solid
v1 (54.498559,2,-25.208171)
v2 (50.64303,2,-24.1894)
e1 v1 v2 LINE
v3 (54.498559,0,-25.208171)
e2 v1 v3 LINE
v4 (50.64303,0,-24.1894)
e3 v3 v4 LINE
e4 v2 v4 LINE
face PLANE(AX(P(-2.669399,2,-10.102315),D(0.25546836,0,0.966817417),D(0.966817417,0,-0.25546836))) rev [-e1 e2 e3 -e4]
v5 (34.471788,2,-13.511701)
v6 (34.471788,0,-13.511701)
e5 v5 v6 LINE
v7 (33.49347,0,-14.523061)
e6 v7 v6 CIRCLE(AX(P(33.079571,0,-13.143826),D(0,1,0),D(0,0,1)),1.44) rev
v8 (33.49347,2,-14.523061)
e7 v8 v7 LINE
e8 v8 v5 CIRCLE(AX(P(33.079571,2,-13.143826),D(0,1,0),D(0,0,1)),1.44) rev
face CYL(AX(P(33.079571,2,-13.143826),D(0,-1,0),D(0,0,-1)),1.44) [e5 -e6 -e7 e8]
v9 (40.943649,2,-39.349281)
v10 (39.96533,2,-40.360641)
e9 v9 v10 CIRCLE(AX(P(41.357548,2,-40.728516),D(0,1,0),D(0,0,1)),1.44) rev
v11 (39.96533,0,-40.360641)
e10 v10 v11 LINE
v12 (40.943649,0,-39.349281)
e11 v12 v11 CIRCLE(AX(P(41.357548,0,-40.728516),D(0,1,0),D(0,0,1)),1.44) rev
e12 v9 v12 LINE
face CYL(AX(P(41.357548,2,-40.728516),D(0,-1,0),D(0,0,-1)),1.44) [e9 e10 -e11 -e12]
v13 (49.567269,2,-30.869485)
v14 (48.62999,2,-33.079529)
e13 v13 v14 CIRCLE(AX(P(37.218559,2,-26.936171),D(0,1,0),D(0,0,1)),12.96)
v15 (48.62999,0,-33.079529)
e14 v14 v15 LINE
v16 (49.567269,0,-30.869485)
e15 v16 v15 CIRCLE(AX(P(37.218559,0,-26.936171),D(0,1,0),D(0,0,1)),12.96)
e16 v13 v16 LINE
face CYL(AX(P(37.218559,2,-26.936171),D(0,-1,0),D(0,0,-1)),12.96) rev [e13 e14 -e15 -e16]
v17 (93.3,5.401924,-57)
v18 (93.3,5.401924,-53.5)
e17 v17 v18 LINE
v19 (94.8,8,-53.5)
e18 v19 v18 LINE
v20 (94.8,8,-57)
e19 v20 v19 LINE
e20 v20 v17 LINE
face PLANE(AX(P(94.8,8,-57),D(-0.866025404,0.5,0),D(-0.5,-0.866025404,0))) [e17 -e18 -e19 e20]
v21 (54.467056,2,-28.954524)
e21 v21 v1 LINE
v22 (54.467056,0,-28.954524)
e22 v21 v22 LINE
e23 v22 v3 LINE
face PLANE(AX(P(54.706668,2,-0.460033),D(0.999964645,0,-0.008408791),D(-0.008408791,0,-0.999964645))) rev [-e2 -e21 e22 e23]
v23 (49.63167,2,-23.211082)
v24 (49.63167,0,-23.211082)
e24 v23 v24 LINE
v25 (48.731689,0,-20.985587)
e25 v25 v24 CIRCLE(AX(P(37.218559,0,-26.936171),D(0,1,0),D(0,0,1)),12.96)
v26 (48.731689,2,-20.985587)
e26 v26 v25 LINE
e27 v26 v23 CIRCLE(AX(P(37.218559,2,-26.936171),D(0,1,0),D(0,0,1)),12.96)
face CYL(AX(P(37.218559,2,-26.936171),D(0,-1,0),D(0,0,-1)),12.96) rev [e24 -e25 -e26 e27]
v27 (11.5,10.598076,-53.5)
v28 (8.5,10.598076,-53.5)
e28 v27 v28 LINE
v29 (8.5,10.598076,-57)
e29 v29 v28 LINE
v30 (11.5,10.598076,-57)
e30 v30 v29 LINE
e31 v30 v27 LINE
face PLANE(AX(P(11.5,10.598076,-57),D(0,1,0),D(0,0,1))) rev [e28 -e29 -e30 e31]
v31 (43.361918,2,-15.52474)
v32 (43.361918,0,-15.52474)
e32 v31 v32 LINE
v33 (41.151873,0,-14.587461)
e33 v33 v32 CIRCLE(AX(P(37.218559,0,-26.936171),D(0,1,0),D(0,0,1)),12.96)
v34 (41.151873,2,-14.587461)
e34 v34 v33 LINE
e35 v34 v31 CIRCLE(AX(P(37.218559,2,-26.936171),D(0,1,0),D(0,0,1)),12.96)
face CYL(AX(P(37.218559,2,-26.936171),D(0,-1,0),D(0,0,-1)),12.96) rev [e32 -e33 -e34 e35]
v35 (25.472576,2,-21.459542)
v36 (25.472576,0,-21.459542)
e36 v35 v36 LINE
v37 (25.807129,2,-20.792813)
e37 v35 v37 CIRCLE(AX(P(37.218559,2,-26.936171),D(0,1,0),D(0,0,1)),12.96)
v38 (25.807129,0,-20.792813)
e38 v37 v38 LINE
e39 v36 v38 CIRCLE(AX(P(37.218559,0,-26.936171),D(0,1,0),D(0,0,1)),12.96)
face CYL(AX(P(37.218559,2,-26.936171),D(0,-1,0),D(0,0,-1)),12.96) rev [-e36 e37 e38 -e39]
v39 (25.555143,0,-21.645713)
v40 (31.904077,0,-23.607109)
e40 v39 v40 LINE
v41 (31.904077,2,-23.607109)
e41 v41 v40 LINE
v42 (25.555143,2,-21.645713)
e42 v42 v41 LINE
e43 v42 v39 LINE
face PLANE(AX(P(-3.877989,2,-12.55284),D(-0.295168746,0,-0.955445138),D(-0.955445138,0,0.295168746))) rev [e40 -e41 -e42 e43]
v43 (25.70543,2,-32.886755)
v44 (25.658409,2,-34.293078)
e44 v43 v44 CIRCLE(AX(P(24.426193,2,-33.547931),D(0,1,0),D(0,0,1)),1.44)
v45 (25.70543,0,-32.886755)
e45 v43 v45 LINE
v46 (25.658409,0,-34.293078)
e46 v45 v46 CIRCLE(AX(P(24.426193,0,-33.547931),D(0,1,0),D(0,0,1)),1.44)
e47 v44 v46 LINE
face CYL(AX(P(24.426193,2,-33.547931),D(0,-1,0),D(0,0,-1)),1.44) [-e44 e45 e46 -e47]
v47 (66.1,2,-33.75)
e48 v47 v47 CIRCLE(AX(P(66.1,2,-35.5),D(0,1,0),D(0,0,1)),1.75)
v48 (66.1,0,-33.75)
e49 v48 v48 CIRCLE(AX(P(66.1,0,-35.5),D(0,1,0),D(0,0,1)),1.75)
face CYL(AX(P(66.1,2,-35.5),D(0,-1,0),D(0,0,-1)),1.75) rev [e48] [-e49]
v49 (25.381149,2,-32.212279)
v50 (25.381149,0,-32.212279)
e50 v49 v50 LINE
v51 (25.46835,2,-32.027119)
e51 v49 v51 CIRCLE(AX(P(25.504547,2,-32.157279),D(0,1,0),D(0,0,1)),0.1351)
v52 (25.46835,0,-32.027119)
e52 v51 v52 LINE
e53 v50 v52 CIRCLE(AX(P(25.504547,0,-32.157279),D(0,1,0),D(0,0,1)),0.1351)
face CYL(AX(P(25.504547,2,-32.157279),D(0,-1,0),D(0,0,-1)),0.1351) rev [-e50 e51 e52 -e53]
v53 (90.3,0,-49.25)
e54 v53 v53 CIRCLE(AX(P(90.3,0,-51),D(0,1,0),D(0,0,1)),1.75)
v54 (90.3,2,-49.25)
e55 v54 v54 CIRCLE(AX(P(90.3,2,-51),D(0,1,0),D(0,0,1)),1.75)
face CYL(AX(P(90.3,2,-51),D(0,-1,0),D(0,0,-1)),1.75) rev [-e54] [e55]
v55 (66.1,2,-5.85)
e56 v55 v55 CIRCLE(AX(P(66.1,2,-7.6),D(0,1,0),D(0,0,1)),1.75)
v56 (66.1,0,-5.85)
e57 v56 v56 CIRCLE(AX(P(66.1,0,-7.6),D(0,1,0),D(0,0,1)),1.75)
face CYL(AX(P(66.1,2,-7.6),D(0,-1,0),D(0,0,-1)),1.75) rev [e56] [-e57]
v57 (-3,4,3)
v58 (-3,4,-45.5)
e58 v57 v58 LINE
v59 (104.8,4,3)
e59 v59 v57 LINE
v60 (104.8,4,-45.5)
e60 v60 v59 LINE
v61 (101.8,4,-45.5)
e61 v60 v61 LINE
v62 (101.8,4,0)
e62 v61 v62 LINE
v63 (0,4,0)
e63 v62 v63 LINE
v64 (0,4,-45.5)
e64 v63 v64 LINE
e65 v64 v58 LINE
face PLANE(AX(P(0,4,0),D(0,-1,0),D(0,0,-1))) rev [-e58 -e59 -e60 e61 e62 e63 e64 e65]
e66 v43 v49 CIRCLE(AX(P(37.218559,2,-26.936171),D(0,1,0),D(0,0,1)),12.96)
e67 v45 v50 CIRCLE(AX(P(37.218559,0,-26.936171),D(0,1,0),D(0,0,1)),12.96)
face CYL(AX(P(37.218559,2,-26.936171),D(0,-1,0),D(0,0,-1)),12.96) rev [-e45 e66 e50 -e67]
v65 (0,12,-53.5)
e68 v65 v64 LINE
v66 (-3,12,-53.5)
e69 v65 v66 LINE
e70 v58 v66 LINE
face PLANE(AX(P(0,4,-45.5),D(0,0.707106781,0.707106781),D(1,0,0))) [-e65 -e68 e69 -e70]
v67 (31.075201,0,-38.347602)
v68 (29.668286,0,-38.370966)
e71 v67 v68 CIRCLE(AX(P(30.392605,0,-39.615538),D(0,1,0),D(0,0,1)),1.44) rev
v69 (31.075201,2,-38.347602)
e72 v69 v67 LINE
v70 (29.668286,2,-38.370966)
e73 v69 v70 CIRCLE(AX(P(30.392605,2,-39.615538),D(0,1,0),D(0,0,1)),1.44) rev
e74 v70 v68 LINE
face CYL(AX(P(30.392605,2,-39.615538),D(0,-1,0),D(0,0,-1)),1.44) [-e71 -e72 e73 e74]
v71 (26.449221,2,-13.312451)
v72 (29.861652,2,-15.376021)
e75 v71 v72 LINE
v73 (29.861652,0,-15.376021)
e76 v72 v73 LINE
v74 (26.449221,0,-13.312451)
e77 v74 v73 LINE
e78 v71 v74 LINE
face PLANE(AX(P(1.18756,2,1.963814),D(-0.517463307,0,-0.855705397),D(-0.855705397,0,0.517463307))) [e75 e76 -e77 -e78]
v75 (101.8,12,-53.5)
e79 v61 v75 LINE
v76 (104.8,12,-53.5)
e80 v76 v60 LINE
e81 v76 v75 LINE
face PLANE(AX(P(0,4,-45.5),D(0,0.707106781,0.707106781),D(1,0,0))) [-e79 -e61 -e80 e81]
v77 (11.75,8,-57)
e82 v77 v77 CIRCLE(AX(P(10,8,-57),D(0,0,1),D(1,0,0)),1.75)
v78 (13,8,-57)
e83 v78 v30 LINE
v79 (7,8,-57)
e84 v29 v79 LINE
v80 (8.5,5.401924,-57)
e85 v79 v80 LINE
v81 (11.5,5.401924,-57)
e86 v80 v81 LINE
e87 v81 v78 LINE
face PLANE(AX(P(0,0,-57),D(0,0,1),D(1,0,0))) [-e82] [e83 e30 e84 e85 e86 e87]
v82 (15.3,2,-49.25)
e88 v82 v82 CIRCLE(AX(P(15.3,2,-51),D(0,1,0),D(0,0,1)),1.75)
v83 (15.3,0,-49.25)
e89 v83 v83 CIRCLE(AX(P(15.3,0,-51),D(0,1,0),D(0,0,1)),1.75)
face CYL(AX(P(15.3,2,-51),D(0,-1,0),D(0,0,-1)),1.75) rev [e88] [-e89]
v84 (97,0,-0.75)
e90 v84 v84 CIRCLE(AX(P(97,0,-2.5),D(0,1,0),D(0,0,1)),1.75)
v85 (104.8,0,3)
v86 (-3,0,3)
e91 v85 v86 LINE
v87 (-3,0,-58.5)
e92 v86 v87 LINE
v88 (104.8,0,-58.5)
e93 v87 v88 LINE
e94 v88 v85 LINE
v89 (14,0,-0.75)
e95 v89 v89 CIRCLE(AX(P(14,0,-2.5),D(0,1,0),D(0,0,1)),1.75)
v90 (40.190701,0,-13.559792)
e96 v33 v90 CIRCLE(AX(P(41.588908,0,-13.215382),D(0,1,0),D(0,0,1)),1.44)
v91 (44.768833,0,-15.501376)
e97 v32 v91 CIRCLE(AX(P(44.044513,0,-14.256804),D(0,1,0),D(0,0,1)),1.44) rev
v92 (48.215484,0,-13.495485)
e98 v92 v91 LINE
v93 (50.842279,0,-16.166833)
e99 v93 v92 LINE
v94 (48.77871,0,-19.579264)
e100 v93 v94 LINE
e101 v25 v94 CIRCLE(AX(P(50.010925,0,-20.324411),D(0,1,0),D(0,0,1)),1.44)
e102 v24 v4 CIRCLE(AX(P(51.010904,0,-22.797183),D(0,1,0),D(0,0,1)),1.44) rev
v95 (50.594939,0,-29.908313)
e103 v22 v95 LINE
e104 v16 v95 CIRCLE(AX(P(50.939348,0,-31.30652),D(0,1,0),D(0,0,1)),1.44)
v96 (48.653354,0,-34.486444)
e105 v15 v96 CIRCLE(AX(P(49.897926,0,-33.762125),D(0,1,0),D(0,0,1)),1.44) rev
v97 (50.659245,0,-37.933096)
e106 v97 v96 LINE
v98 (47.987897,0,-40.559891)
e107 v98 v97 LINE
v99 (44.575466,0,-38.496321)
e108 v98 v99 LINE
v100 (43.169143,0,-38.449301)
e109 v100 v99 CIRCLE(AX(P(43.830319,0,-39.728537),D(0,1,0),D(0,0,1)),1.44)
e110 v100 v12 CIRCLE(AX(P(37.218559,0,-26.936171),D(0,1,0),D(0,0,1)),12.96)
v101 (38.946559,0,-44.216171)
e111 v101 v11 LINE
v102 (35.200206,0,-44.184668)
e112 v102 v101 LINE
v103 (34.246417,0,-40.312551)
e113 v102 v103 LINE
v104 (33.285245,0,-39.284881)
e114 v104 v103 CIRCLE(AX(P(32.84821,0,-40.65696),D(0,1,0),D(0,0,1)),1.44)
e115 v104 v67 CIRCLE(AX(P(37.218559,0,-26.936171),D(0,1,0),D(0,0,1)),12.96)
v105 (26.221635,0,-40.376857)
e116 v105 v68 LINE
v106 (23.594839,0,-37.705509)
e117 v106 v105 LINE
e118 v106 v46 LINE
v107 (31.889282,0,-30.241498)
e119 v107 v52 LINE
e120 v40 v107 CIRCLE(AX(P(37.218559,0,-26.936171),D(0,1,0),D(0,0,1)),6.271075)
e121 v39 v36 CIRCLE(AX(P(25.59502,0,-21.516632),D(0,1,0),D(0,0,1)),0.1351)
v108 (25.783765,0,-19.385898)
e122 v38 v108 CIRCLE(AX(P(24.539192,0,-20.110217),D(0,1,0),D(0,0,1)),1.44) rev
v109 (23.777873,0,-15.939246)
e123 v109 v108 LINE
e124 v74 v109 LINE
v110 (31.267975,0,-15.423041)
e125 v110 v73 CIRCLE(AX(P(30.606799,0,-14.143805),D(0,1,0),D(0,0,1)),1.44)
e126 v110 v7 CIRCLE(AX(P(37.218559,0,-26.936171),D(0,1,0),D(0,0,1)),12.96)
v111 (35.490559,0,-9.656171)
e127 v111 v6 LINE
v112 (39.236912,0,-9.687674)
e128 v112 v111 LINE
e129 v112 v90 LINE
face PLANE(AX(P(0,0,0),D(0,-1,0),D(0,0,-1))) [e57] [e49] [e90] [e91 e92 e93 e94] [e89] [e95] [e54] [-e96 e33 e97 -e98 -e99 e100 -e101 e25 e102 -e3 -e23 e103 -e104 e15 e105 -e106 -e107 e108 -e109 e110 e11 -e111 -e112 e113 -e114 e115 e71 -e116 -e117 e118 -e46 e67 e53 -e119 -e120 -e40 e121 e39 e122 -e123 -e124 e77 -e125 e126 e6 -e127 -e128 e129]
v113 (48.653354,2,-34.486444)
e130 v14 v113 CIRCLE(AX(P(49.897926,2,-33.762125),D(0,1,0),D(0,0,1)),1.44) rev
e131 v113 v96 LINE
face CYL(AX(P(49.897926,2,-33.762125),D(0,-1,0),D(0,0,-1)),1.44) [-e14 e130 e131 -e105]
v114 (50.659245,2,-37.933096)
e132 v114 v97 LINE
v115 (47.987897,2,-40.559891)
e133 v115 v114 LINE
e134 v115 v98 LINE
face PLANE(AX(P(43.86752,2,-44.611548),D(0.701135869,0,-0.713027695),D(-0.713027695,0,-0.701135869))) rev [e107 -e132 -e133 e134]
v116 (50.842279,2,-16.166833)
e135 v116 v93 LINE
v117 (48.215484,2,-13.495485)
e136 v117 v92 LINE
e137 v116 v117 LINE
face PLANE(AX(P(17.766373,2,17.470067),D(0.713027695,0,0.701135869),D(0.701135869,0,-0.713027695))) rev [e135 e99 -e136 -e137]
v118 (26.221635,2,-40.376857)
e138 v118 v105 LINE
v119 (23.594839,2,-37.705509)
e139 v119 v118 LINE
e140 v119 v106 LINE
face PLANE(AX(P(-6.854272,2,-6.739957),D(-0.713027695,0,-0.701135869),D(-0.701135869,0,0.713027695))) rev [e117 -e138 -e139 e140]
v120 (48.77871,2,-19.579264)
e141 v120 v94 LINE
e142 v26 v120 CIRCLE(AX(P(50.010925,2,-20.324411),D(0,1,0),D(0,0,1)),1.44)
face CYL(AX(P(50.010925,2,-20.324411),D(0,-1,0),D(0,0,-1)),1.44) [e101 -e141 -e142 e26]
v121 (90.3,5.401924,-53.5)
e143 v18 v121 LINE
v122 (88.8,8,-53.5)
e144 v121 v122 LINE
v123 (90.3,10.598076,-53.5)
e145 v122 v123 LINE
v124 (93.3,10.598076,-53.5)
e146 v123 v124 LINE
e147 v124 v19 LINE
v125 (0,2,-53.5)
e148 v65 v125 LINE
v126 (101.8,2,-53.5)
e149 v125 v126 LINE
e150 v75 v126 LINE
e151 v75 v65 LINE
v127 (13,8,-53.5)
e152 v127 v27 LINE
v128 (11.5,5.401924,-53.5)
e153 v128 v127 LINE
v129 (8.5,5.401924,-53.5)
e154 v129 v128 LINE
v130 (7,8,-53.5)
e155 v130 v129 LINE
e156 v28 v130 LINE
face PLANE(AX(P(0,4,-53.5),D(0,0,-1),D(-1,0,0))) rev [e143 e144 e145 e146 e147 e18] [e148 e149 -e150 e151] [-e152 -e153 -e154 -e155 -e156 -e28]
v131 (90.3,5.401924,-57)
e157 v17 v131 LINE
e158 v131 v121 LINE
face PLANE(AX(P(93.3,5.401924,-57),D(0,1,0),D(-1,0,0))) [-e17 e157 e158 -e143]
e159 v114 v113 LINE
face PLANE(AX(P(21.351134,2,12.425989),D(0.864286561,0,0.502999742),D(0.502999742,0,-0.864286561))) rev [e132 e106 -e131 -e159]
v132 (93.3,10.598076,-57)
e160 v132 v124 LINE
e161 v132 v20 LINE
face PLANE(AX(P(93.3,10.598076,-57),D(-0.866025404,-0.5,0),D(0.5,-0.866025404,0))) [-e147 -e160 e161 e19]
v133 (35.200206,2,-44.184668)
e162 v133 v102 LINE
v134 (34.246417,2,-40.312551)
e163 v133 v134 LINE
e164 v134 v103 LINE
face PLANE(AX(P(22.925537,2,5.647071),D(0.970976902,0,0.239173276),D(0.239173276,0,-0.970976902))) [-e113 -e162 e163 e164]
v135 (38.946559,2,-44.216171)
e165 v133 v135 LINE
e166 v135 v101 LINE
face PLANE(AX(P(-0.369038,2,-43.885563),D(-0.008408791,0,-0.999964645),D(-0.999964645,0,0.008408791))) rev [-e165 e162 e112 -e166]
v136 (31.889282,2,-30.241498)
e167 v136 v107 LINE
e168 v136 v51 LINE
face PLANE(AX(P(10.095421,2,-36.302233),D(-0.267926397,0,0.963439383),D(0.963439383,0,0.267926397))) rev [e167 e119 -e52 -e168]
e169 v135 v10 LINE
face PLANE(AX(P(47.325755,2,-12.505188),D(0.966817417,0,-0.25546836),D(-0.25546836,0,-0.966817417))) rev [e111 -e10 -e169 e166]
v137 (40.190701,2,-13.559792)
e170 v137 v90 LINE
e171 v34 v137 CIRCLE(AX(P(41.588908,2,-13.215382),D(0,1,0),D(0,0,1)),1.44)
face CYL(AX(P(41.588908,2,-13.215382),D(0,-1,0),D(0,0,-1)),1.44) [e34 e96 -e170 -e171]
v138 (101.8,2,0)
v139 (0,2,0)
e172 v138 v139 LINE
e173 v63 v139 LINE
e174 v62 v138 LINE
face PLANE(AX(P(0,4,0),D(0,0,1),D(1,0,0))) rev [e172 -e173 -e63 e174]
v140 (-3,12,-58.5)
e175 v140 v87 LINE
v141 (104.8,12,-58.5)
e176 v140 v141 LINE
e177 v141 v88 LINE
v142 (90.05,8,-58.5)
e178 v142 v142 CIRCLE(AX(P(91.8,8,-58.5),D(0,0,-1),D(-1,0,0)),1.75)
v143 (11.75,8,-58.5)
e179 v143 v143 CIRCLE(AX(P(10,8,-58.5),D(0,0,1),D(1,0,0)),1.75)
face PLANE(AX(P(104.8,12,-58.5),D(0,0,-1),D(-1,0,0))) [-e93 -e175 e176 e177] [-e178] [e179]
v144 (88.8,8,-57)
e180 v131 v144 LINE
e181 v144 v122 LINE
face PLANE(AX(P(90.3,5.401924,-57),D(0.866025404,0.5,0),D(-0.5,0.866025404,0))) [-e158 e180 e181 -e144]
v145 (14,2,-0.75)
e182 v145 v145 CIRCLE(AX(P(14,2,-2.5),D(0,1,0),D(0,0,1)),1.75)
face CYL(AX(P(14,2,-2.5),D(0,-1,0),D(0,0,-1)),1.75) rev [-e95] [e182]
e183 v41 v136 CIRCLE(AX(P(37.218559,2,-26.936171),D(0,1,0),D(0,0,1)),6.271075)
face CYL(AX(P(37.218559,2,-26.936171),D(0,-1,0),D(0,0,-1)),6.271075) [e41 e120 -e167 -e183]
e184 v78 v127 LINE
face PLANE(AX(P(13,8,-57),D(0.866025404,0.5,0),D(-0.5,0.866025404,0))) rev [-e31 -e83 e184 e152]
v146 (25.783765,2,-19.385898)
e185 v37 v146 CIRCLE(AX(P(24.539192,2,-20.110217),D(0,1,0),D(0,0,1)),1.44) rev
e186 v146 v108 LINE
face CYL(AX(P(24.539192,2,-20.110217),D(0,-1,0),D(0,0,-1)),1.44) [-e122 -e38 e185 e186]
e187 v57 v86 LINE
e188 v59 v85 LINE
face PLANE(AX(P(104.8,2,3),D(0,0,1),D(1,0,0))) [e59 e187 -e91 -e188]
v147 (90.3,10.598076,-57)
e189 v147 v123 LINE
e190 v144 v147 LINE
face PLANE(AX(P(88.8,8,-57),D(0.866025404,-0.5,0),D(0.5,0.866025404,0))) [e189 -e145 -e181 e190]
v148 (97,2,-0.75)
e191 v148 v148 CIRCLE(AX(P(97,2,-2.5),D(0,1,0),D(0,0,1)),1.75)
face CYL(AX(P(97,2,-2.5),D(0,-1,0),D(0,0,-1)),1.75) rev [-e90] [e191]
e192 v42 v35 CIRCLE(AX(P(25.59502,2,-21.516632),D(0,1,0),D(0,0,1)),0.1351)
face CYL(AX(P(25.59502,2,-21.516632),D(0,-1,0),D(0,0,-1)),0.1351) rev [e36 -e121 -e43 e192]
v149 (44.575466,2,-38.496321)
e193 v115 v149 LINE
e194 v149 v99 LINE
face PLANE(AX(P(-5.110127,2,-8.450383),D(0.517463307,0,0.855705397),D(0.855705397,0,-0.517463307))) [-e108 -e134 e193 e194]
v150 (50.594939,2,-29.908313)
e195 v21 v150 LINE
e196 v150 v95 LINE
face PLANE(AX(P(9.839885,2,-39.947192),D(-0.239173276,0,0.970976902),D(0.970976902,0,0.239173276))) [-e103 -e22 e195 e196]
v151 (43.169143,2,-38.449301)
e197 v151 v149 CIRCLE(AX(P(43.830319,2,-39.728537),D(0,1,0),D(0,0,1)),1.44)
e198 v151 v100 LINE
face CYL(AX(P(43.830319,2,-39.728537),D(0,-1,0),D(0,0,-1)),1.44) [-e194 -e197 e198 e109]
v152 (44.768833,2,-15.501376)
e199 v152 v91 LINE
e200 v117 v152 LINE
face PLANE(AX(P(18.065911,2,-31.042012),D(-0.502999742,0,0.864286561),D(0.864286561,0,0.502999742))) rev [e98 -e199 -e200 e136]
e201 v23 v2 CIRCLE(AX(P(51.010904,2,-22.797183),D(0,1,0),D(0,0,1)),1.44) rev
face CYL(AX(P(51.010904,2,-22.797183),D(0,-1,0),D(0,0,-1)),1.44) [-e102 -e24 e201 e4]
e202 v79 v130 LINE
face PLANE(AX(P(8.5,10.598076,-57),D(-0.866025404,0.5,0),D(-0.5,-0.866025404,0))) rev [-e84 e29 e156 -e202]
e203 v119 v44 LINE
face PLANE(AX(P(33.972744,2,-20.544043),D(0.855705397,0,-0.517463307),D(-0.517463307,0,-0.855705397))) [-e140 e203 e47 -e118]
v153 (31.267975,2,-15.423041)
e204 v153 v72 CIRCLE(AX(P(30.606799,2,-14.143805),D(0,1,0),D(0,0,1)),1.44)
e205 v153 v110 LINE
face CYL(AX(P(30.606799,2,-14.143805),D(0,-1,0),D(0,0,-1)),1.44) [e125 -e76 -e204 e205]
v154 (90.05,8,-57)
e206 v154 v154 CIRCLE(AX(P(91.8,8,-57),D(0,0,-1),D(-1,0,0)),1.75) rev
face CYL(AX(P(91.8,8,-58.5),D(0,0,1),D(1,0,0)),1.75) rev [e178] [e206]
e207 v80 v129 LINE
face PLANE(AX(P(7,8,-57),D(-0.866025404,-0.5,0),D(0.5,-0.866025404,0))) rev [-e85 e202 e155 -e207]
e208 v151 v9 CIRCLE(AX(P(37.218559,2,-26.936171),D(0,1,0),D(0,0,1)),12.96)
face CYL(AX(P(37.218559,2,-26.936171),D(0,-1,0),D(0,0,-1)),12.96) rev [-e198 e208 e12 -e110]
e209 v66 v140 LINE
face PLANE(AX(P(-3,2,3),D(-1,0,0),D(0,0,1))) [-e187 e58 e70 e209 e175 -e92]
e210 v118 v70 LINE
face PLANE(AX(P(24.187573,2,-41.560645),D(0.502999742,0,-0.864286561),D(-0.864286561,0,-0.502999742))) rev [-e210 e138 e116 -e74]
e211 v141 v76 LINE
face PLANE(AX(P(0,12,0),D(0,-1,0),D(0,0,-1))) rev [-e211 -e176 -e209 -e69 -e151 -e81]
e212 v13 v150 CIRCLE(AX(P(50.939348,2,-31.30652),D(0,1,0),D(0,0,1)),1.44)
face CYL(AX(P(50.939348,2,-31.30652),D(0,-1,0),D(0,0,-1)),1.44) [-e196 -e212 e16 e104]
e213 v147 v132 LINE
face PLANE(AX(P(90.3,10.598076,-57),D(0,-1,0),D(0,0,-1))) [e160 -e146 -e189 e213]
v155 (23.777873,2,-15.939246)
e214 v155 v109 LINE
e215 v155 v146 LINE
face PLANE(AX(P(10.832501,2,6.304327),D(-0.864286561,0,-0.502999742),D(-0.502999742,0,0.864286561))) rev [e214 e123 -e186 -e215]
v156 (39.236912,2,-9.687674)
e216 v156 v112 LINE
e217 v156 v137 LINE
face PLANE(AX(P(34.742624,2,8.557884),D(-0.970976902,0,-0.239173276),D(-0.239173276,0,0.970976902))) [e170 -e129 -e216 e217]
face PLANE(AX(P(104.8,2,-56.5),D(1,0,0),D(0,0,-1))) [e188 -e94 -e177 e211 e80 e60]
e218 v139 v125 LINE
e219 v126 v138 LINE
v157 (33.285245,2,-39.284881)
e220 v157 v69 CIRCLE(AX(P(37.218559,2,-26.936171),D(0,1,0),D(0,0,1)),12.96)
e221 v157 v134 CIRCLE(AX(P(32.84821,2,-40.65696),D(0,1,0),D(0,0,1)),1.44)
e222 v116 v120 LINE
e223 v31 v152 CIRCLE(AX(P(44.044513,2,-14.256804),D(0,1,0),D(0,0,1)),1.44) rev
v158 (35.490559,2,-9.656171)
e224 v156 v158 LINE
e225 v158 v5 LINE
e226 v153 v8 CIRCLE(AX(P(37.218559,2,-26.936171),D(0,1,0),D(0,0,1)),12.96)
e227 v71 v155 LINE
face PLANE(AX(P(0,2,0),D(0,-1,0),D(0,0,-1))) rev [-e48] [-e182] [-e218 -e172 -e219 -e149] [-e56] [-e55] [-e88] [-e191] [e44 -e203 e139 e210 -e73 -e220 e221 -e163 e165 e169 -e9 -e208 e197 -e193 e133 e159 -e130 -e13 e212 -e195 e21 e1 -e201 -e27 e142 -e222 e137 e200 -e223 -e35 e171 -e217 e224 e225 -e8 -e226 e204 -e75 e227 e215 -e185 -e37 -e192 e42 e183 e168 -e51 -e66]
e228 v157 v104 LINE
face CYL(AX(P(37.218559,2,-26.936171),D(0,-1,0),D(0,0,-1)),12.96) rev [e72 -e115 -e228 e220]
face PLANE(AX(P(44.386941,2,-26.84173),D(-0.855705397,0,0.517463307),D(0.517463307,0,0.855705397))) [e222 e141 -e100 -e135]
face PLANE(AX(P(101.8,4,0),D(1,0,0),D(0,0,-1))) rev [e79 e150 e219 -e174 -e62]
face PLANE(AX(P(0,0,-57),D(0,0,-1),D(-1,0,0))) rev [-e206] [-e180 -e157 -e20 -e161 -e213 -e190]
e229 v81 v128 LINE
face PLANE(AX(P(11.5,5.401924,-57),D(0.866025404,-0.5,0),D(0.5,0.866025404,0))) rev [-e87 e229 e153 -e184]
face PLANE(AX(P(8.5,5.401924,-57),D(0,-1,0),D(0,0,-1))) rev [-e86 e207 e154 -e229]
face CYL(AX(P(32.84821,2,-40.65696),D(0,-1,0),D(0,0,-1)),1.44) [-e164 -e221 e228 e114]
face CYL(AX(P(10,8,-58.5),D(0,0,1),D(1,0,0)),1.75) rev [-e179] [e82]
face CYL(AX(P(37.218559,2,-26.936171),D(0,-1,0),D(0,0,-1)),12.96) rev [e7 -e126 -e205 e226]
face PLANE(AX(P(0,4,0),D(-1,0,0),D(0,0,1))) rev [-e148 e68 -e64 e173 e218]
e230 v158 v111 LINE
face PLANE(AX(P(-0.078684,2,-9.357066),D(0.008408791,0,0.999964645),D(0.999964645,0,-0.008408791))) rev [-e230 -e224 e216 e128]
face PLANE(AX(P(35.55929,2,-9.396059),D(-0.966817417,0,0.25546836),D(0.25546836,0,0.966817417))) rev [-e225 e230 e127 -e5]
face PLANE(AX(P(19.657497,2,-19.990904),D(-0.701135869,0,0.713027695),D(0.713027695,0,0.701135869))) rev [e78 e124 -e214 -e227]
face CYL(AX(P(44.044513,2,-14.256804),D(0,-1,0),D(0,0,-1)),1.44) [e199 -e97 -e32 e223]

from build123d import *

# Parameters (mm, degrees)
SKETCH1_W           = 107.8
SKETCH1_H           = 59.5
SKETCH1_R           = 1.75
BOSS_EXTRUDE1_DEPTH = 2
BOSS_EXTRUDE2_START = 2
SKETCH1_3_W         = 107.8
SKETCH1_3_H         = 59.5
SKETCH1_3_W_2       = 101.8
SKETCH1_3_H_2       = 53.5
SKETCH1_3_R         = 1.75
BOSS_EXTRUDE2_DEPTH = 2
SKETCH3_W           = 107.8
SKETCH3_H           = 5
BOSS_EXTRUDE3_DEPTH = 12
CHAMFER1_SIZE       = 8
CUT_EXTRUDE1_DEPTH  = 3.5
SKETCH4_4_R         = 1.75
CUT_EXTRUDE3_DEPTH  = 120.663235791


with BuildPart() as part:
    # Sketch1 → Boss-Extrude1 (new body)
    with BuildSketch(Plane(origin=(0, 0, 0), x_dir=(1, 0, 0), z_dir=(0, 1, 0))):
        with Locations((50.9, 26.75)):
            Rectangle(SKETCH1_W, SKETCH1_H)
        with Locations(Location((15.3, 51, 0), (0, 0, 270))):
            Circle(SKETCH1_R, mode=Mode.SUBTRACT)
        with Locations(Location((14, 2.5, 0), (0, 0, 270))):
            Circle(SKETCH1_R, mode=Mode.SUBTRACT)
        with Locations(Location((90.3, 51, 0), (0, 0, 270))):
            Circle(SKETCH1_R, mode=Mode.SUBTRACT)
        with Locations(Location((97, 2.5, 0), (0, 0, 270))):
            Circle(SKETCH1_R, mode=Mode.SUBTRACT)
        with Locations(Location((66.1, 35.5, 0), (0, 0, 270))):
            Circle(SKETCH1_R, mode=Mode.SUBTRACT)
        with Locations(Location((66.1, 7.6, 0), (0, 0, 270))):
            Circle(SKETCH1_R, mode=Mode.SUBTRACT)
        with BuildLine():
            Line((23.594839055, 37.705508722), (26.221634516, 40.37685674))
            Line((26.221634516, 40.37685674), (29.668285754, 38.370965683))
            ThreePointArc((29.668285754, 38.370965683), (30.368695169, 38.175736851), (31.075200762, 38.347601602))
            ThreePointArc((31.075200762, 38.347601602), (32.158474755, 38.867522419), (33.285245302, 39.284881177))
            ThreePointArc((33.285245302, 39.284881177), (33.899901464, 39.673320939), (34.246417166, 40.312550564))
            Line((34.246417166, 40.312550564), (35.200205995, 44.184667628))
            Line((35.200205995, 44.184667628), (38.946559177, 44.216171044))
            Line((38.946559177, 44.216171044), (39.96533047, 40.360641412))
            ThreePointArc((39.96533047, 40.360641412), (40.322547086, 39.727329534), (40.943648713, 39.349281369))
            ThreePointArc((40.943648713, 39.349281369), (42.077278635, 38.950930518), (43.169142938, 38.449300631))
            ThreePointArc((43.169142938, 38.449300631), (43.878438868, 38.28934148), (44.575466073, 38.49632148))
            Line((44.575466073, 38.49632148), (47.987896856, 40.559891165))
            Line((47.987896856, 40.559891165), (50.659244873, 37.933095705))
            Line((50.659244873, 37.933095705), (48.653353816, 34.486444467))
            ThreePointArc((48.653353816, 34.486444467), (48.458124984, 33.786035052), (48.629989735, 33.079529459))
            ThreePointArc((48.629989735, 33.079529459), (49.149910552, 31.996255466), (49.56726931, 30.869484918))
            ThreePointArc((49.56726931, 30.869484918), (49.955709072, 30.254828756), (50.594938697, 29.908313054))
            Line((50.594938697, 29.908313054), (54.467055761, 28.954524225))
            Line((54.467055761, 28.954524225), (54.498559177, 25.208171044))
            Line((54.498559177, 25.208171044), (50.643029545, 24.18939975))
            ThreePointArc((50.643029545, 24.18939975), (50.009717667, 23.832183134), (49.631669502, 23.211081507))
            ThreePointArc((49.631669502, 23.211081507), (49.233318651, 22.077451586), (48.731688764, 20.985587282))
            ThreePointArc((48.731688764, 20.985587282), (48.571729613, 20.276291353), (48.778709614, 19.579264147))
            Line((48.778709614, 19.579264147), (50.842279299, 16.166833365))
            Line((50.842279299, 16.166833365), (48.215483838, 13.495485347))
            Line((48.215483838, 13.495485347), (44.7688326, 15.501376404))
            ThreePointArc((44.7688326, 15.501376404), (44.068423185, 15.696605237), (43.361917592, 15.524740485))
            ThreePointArc((43.361917592, 15.524740485), (42.278643599, 15.004819668), (41.151873051, 14.58746091))
            ThreePointArc((41.151873051, 14.58746091), (40.537216889, 14.199021149), (40.190701187, 13.559791523))
            Line((40.190701187, 13.559791523), (39.236912358, 9.687674459))
            Line((39.236912358, 9.687674459), (35.490559177, 9.656171044))
            Line((35.490559177, 9.656171044), (34.471787883, 13.511700675))
            ThreePointArc((34.471787883, 13.511700675), (34.114571267, 14.145012554), (33.49346964, 14.523060718))
            ThreePointArc((33.49346964, 14.523060718), (32.359839719, 14.921411569), (31.267975415, 15.423041456))
            ThreePointArc((31.267975415, 15.423041456), (30.558679486, 15.583000607), (29.86165228, 15.376020607))
            Line((29.86165228, 15.376020607), (26.449221498, 13.312450922))
            Line((26.449221498, 13.312450922), (23.77787348, 15.939246383))
            Line((23.77787348, 15.939246383), (25.783764538, 19.38589762))
            ThreePointArc((25.783764538, 19.38589762), (25.97899337, 20.086307036), (25.807128618, 20.792812629))
            ThreePointArc((25.807128618, 20.792812629), (25.63505412, 21.123769595), (25.472575587, 21.45954165))
            ThreePointArc((25.472575587, 21.45954165), (25.471521134, 21.57140422), (25.555142885, 21.645712693))
            Line((25.555142885, 21.645712693), (31.904076526, 23.60710923))
            ThreePointArc((31.904076526, 23.60710923), (43.489618325, 26.950155118), (31.889282249, 30.24149793))
            Line((31.889282249, 30.24149793), (25.46834976, 32.027118633))
            ThreePointArc((25.46834976, 32.027118633), (25.382322518, 32.099718242), (25.381148957, 32.212279391))
            ThreePointArc((25.381148957, 32.212279391), (25.538419769, 32.551858304), (25.705429589, 32.886754805))
            ThreePointArc((25.705429589, 32.886754805), (25.86538874, 33.596050734), (25.65840874, 34.29307794))
            Line((25.65840874, 34.29307794), (23.594839055, 37.705508722))
        make_face(mode=Mode.SUBTRACT)
    extrude(amount=BOSS_EXTRUDE1_DEPTH)

    # Sketch1<3> → Boss-Extrude2 (add)
    # profile 1 of 8: a face of its own
    with BuildSketch(Plane(origin=(0, 0, 0), x_dir=(1, 0, 0), z_dir=(0, 1, 0)).offset(BOSS_EXTRUDE2_START)):
        with Locations((50.9, 26.75)):
            Rectangle(SKETCH1_3_W, SKETCH1_3_H)
        with Locations((50.9, 26.75)):
            Rectangle(SKETCH1_3_W_2, SKETCH1_3_H_2, mode=Mode.SUBTRACT)
    # profile 2 of 8: a face of its own
    with BuildSketch(Plane(origin=(0, 0, 0), x_dir=(1, 0, 0), z_dir=(0, 1, 0)).offset(BOSS_EXTRUDE2_START)):
        with Locations(Location((66.1, 7.6, 0), (0, 0, 270))):
            Circle(SKETCH1_3_R)
    # profile 3 of 8: a face of its own
    with BuildSketch(Plane(origin=(0, 0, 0), x_dir=(1, 0, 0), z_dir=(0, 1, 0)).offset(BOSS_EXTRUDE2_START)):
        with Locations(Location((66.1, 35.5, 0), (0, 0, 270))):
            Circle(SKETCH1_3_R)
    # profile 4 of 8: a face of its own
    with BuildSketch(Plane(origin=(0, 0, 0), x_dir=(1, 0, 0), z_dir=(0, 1, 0)).offset(BOSS_EXTRUDE2_START)):
        with Locations(Location((97, 2.5, 0), (0, 0, 270))):
            Circle(SKETCH1_3_R)
    # profile 5 of 8: a face of its own
    with BuildSketch(Plane(origin=(0, 0, 0), x_dir=(1, 0, 0), z_dir=(0, 1, 0)).offset(BOSS_EXTRUDE2_START)):
        with Locations(Location((90.3, 51, 0), (0, 0, 270))):
            Circle(SKETCH1_3_R)
    # profile 6 of 8: a face of its own
    with BuildSketch(Plane(origin=(0, 0, 0), x_dir=(1, 0, 0), z_dir=(0, 1, 0)).offset(BOSS_EXTRUDE2_START)):
        with Locations(Location((14, 2.5, 0), (0, 0, 270))):
            Circle(SKETCH1_3_R)
    # profile 7 of 8: a face of its own
    with BuildSketch(Plane(origin=(0, 0, 0), x_dir=(1, 0, 0), z_dir=(0, 1, 0)).offset(BOSS_EXTRUDE2_START)):
        with Locations(Location((15.3, 51, 0), (0, 0, 270))):
            Circle(SKETCH1_3_R)
    # profile 8 of 8: a face of its own
    with BuildSketch(Plane(origin=(0, 0, 0), x_dir=(1, 0, 0), z_dir=(0, 1, 0)).offset(BOSS_EXTRUDE2_START)):
        with BuildLine():
            Line((23.594839055, 37.705508722), (26.221634516, 40.37685674))
            Line((26.221634516, 40.37685674), (29.668285754, 38.370965683))
            ThreePointArc((29.668285754, 38.370965683), (30.368695169, 38.175736851), (31.075200762, 38.347601602))
            ThreePointArc((31.075200762, 38.347601602), (32.158474755, 38.867522419), (33.285245302, 39.284881177))
            ThreePointArc((33.285245302, 39.284881177), (33.899901464, 39.673320939), (34.246417166, 40.312550564))
            Line((34.246417166, 40.312550564), (35.200205995, 44.184667628))
            Line((35.200205995, 44.184667628), (38.946559177, 44.216171044))
            Line((38.946559177, 44.216171044), (39.96533047, 40.360641412))
            ThreePointArc((39.96533047, 40.360641412), (40.322547086, 39.727329534), (40.943648713, 39.349281369))
            ThreePointArc((40.943648713, 39.349281369), (42.077278635, 38.950930518), (43.169142938, 38.449300631))
            ThreePointArc((43.169142938, 38.449300631), (43.878438868, 38.28934148), (44.575466073, 38.49632148))
            Line((44.575466073, 38.49632148), (47.987896856, 40.559891165))
            Line((47.987896856, 40.559891165), (50.659244873, 37.933095705))
            Line((50.659244873, 37.933095705), (48.653353816, 34.486444467))
            ThreePointArc((48.653353816, 34.486444467), (48.458124984, 33.786035052), (48.629989735, 33.079529459))
            ThreePointArc((48.629989735, 33.079529459), (49.149910552, 31.996255466), (49.56726931, 30.869484918))
            ThreePointArc((49.56726931, 30.869484918), (49.955709072, 30.254828756), (50.594938697, 29.908313054))
            Line((50.594938697, 29.908313054), (54.467055761, 28.954524225))
            Line((54.467055761, 28.954524225), (54.498559177, 25.208171044))
            Line((54.498559177, 25.208171044), (50.643029545, 24.18939975))
            ThreePointArc((50.643029545, 24.18939975), (50.009717667, 23.832183134), (49.631669502, 23.211081507))
            ThreePointArc((49.631669502, 23.211081507), (49.233318651, 22.077451586), (48.731688764, 20.985587282))
            ThreePointArc((48.731688764, 20.985587282), (48.571729613, 20.276291353), (48.778709614, 19.579264147))
            Line((48.778709614, 19.579264147), (50.842279299, 16.166833365))
            Line((50.842279299, 16.166833365), (48.215483838, 13.495485347))
            Line((48.215483838, 13.495485347), (44.7688326, 15.501376404))
            ThreePointArc((44.7688326, 15.501376404), (44.068423185, 15.696605237), (43.361917592, 15.524740485))
            ThreePointArc((43.361917592, 15.524740485), (42.278643599, 15.004819668), (41.151873051, 14.58746091))
            ThreePointArc((41.151873051, 14.58746091), (40.537216889, 14.199021149), (40.190701187, 13.559791523))
            Line((40.190701187, 13.559791523), (39.236912358, 9.687674459))
            Line((39.236912358, 9.687674459), (35.490559177, 9.656171044))
            Line((35.490559177, 9.656171044), (34.471787883, 13.511700675))
            ThreePointArc((34.471787883, 13.511700675), (34.114571267, 14.145012554), (33.49346964, 14.523060718))
            ThreePointArc((33.49346964, 14.523060718), (32.359839719, 14.921411569), (31.267975415, 15.423041456))
            ThreePointArc((31.267975415, 15.423041456), (30.558679486, 15.583000607), (29.86165228, 15.376020607))
            Line((29.86165228, 15.376020607), (26.449221498, 13.312450922))
            Line((26.449221498, 13.312450922), (23.77787348, 15.939246383))
            Line((23.77787348, 15.939246383), (25.783764538, 19.38589762))
            ThreePointArc((25.783764538, 19.38589762), (25.97899337, 20.086307036), (25.807128618, 20.792812629))
            ThreePointArc((25.807128618, 20.792812629), (25.63505412, 21.123769595), (25.472575587, 21.45954165))
            ThreePointArc((25.472575587, 21.45954165), (25.471521134, 21.57140422), (25.555142885, 21.645712693))
            Line((25.555142885, 21.645712693), (31.904076526, 23.60710923))
            ThreePointArc((31.904076526, 23.60710923), (43.489618325, 26.950155118), (31.889282249, 30.24149793))
            Line((31.889282249, 30.24149793), (25.46834976, 32.027118633))
            ThreePointArc((25.46834976, 32.027118633), (25.382322518, 32.099718242), (25.381148957, 32.212279391))
            ThreePointArc((25.381148957, 32.212279391), (25.538419769, 32.551858304), (25.705429589, 32.886754805))
            ThreePointArc((25.705429589, 32.886754805), (25.86538874, 33.596050734), (25.65840874, 34.29307794))
            Line((25.65840874, 34.29307794), (23.594839055, 37.705508722))
        make_face()
    extrude(amount=BOSS_EXTRUDE2_DEPTH)


with BuildPart() as boss_extrude2_kept_piece:
    # of the separate pieces the step leaves, the one the design keeps (boss_extrude2_pieces_kept)
    add(part.part.solids().sort_by_distance((-3, 0, -56.5))[0])

    # Sketch3 → Boss-Extrude3 (add)
    with BuildSketch(Plane.XZ):
        with Locations((50.9, -56)):
            Rectangle(SKETCH3_W, SKETCH3_H)
    extrude(amount=-BOSS_EXTRUDE3_DEPTH)

    # Chamfer1
    chamfer1_edges = [boss_extrude2_kept_piece.edges().sort_by_distance(p)[0] for p in [
        (-1.5, 4, -53.5),
        (103.3, 4, -53.5),
    ]]
    chamfer(chamfer1_edges, length=CHAMFER1_SIZE - 0.0001)  # a hair under: the kernel refuses the full size

    # Sketch4 → Cut-Extrude1 (cut)
    with BuildSketch(Plane.XY.offset(-53.5)):
        Polygon((11.5, 10.598076211), (8.5, 10.598076211), (7, 8), (8.5, 5.401923789), (11.5, 5.401923789), (13, 8), align=None)
        Polygon((90.3, 10.598076211), (93.3, 10.598076211), (94.8, 8), (93.3, 5.401923789), (90.3, 5.401923789), (88.8, 8), align=None)
    extrude(amount=-CUT_EXTRUDE1_DEPTH, mode=Mode.SUBTRACT)

    # Sketch4<4> → Cut-Extrude3 (cut, through all)
    with BuildSketch(Plane.XY.offset(-53.5)):
        with Locations((10, 8)):
            Circle(SKETCH4_4_R)
        with Locations(Location((91.8, 8, 0), (0, 0, 180))):
            Circle(SKETCH4_4_R)
    extrude(amount=-CUT_EXTRUDE3_DEPTH, mode=Mode.SUBTRACT)


solid = boss_extrude2_kept_piece.part
